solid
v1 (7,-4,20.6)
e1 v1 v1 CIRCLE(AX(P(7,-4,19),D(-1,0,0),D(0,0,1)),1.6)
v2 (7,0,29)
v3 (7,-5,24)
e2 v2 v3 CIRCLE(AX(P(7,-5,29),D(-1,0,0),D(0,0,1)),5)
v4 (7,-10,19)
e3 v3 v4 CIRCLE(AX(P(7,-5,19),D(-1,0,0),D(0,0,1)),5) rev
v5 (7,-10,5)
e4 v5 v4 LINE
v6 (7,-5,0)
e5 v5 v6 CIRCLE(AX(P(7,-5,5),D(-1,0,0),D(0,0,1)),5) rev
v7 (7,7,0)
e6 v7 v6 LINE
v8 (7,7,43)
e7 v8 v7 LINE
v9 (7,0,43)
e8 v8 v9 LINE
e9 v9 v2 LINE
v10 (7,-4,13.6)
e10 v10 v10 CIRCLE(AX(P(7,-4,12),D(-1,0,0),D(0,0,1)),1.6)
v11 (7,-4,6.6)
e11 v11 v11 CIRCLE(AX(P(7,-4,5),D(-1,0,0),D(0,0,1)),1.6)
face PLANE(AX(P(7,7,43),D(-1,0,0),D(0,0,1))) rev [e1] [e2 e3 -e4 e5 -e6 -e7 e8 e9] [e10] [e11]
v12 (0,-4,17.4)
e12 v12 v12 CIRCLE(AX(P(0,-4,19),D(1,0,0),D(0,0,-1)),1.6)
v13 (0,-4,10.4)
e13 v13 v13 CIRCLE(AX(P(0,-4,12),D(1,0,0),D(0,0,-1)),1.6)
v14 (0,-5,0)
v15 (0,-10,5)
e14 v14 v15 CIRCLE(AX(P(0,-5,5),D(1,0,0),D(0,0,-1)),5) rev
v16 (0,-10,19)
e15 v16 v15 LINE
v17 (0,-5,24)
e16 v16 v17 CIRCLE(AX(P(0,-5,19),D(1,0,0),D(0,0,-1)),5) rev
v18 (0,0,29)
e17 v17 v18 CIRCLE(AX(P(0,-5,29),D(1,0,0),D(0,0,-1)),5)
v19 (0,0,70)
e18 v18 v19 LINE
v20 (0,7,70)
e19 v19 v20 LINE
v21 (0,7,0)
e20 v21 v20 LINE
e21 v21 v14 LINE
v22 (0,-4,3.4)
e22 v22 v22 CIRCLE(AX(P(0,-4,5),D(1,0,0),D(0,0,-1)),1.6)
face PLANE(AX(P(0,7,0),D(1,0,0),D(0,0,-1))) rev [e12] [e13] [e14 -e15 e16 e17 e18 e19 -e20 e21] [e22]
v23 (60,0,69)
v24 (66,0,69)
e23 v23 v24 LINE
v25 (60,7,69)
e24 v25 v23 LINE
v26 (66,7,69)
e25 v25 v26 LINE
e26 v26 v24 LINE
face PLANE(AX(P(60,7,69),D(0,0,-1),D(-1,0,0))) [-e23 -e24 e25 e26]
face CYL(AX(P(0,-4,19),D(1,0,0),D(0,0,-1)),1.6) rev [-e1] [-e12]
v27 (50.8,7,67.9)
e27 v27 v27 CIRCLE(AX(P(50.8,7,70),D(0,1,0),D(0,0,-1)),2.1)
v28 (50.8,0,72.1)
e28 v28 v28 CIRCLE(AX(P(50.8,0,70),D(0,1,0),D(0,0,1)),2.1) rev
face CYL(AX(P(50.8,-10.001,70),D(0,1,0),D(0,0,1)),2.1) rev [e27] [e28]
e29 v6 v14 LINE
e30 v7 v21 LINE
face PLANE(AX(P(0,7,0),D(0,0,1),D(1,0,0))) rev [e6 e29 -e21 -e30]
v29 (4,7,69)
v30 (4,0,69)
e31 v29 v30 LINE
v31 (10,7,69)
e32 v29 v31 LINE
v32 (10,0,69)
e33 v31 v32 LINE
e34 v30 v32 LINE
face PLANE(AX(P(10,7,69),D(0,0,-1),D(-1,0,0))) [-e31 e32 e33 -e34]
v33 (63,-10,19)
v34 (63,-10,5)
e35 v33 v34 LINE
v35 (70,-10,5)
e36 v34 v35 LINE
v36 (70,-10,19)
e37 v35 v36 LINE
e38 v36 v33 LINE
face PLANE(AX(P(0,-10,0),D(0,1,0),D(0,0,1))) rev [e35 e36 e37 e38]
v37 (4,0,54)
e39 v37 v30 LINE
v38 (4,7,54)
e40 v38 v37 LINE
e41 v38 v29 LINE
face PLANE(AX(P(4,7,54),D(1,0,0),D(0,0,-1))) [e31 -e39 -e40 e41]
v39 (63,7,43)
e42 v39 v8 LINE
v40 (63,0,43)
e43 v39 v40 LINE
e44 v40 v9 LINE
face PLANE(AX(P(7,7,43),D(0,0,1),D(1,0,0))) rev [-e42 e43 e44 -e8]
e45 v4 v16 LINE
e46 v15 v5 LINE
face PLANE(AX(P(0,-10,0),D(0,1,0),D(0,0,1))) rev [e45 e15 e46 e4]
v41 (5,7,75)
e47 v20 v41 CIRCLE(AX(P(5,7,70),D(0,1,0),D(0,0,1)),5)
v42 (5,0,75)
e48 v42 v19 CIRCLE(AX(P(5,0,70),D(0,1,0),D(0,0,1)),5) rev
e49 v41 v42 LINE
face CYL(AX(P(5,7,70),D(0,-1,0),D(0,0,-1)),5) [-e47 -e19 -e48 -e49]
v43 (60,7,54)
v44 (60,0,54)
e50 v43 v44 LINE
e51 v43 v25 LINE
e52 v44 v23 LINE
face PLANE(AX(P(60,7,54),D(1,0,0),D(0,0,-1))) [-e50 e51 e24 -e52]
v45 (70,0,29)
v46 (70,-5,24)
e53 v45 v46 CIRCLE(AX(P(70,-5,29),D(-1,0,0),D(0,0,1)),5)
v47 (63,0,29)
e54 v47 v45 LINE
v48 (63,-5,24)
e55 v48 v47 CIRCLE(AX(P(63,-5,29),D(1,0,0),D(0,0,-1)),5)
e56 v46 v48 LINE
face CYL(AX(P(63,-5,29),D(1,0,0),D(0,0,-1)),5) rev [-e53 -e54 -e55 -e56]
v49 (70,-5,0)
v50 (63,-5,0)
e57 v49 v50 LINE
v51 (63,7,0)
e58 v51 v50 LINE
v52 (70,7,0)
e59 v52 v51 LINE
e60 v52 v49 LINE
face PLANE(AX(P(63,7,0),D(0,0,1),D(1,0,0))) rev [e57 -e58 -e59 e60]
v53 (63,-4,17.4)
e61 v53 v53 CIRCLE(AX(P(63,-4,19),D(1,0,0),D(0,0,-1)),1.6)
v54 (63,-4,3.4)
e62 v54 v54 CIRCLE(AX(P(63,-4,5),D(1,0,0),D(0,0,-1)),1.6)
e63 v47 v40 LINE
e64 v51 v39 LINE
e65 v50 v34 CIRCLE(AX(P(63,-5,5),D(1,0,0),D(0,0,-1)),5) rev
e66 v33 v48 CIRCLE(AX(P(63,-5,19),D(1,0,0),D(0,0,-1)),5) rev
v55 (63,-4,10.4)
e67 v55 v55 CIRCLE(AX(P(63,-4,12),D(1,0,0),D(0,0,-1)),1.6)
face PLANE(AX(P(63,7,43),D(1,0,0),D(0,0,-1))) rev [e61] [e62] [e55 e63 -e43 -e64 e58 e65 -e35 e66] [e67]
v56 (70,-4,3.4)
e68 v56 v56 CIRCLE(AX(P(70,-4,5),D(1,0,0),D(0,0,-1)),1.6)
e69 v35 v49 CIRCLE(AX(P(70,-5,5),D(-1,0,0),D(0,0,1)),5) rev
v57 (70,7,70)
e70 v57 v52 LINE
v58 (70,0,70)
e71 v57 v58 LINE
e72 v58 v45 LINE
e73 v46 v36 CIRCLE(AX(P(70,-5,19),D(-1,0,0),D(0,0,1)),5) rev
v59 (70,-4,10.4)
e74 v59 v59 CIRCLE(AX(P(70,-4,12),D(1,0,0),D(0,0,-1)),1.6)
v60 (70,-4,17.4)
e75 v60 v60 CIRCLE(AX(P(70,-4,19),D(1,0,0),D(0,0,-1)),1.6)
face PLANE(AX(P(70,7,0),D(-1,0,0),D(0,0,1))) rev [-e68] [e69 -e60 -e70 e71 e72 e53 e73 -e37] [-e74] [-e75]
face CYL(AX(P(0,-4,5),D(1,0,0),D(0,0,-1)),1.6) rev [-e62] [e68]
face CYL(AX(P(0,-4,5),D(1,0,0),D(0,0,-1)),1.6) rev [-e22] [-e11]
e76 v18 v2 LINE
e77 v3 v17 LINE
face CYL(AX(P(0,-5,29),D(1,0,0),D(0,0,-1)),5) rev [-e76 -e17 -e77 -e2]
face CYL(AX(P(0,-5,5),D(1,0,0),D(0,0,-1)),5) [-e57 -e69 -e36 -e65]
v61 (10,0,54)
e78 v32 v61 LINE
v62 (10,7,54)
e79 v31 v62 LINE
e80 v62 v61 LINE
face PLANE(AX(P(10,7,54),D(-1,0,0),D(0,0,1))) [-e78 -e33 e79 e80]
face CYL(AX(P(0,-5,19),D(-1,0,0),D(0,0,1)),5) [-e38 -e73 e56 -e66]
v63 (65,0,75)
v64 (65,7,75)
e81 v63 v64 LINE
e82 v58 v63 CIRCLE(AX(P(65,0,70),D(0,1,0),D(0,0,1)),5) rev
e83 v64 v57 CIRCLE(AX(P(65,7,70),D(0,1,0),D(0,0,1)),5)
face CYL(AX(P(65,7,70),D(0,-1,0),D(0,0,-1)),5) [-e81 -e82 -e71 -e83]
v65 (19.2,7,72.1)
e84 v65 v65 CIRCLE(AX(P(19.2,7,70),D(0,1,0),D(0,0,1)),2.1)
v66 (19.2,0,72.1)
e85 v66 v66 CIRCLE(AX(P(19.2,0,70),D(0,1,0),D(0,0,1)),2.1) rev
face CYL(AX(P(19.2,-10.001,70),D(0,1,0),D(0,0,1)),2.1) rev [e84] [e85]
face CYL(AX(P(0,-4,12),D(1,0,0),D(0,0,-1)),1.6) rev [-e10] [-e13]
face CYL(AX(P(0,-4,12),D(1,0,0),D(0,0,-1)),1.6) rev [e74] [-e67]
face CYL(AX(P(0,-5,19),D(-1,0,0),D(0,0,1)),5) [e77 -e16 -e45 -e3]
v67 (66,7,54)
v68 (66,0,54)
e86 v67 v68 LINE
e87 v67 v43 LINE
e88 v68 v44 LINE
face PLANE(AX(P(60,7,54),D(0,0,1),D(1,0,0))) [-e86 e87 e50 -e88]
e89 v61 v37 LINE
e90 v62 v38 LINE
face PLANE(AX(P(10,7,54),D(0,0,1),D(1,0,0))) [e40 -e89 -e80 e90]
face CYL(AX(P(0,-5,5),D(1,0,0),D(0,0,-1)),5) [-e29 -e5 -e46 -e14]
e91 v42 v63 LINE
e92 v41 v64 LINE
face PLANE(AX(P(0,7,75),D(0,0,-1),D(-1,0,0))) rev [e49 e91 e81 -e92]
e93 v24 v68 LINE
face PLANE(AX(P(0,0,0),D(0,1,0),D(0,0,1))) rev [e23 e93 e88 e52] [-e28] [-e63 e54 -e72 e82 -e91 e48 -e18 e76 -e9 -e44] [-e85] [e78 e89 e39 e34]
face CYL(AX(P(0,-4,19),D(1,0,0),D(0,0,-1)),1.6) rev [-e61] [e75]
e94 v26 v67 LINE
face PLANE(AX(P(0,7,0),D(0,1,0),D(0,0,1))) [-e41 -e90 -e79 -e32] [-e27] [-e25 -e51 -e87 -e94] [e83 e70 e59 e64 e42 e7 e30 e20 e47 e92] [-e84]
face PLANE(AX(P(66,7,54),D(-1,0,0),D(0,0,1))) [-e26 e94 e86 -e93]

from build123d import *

# Parameters (mm, degrees)
SKETCH_1_W          = 6
SKETCH_1_H          = 15
EXTRUDE_1_DEPTH     = 7
SKETCH_2_W          = 7
SKETCH_2_H          = 24
EXTRUDE_2_DEPTH     = 10
SKETCH_3_R          = 1.6
CUT_EXTRUDE_1_DEPTH = 104.07764064
CUT_EXTRUDE_2_REACH = 105.99
SKETCH_7_R          = 2.1
FILLET_1_R          = 5


with BuildPart() as part:
    # 草图1 → 凸台-拉伸1 (new body)
    with BuildSketch(Plane(origin=(0, 0, 0), x_dir=(1, 0, 0), z_dir=(0, 1, 0))):
        Polygon((7, -43), (63, -43), (63, 0), (70, 0), (70, -75), (0, -75), (0, 0), (7, 0), align=None)
        with Locations((63, -61.5)):
            Rectangle(SKETCH_1_W, SKETCH_1_H, mode=Mode.SUBTRACT)
        with Locations((7, -61.5)):
            Rectangle(SKETCH_1_W, SKETCH_1_H, mode=Mode.SUBTRACT)
    extrude(amount=EXTRUDE_1_DEPTH)

    # 草图2 → 凸台-拉伸2 (add)
    with BuildSketch(Plane.XZ):
        with Locations((3.5, 12)):
            Rectangle(SKETCH_2_W, SKETCH_2_H)
        with Locations((66.5, 12)):
            Rectangle(SKETCH_2_W, SKETCH_2_H)
    extrude(amount=EXTRUDE_2_DEPTH)

    # 草图3 → 切除-拉伸1 (cut, through all)
    with BuildSketch(Plane(origin=(70, 0, 0), x_dir=(0, 0, -1), z_dir=(1, 0, 0))):
        with Locations((-12, -4)):
            Circle(SKETCH_3_R)
        with Locations((-19, -4)):
            Circle(SKETCH_3_R)
        with Locations((-5, -4)):
            Circle(SKETCH_3_R)
    extrude(amount=-CUT_EXTRUDE_1_DEPTH, mode=Mode.SUBTRACT)

    # 草图7 → 切除-拉伸2 (cut, up to next)
    with BuildSketch(Plane(origin=(0, 7, 0), x_dir=(1, 0, 0), z_dir=(0, 1, 0)), mode=Mode.PRIVATE) as cut_extrude_2_sk1:
        with Locations(Location((19.2, -70, 0), (0, 0, 270))):
            Circle(SKETCH_7_R)
    cut_extrude_2_tool1 = extrude(cut_extrude_2_sk1.sketch, amount=-CUT_EXTRUDE_2_REACH, mode=Mode.PRIVATE) & part.part
    # 草图7 → 切除-拉伸2 (cut, up to next)
    with BuildSketch(Plane(origin=(0, 7, 0), x_dir=(1, 0, 0), z_dir=(0, 1, 0)), mode=Mode.PRIVATE) as cut_extrude_2_sk2:
        with Locations(Location((50.8, -70, 0), (0, 0, 270))):
            Circle(SKETCH_7_R)
    cut_extrude_2_tool2 = extrude(cut_extrude_2_sk2.sketch, amount=-CUT_EXTRUDE_2_REACH, mode=Mode.PRIVATE) & part.part
    add(cut_extrude_2_tool1.solids().sort_by_distance((19.2, 7, 70))[0], mode=Mode.SUBTRACT)
    add(cut_extrude_2_tool2.solids().sort_by_distance((50.8, 7, 70))[0], mode=Mode.SUBTRACT)

    # 圆角1
    fillet_1_edges = [part.edges().sort_by_distance(p)[0] for p in [
        (70, 3.5, 75),
        (0, 3.5, 75),
        (66.5, -10, 24),
        (66.5, 0, 24),
        (66.5, -10, 0),
        (3.5, -10, 0),
        (3.5, -10, 24),
        (3.5, 0, 24),
    ]]
    fillet(fillet_1_edges, radius=FILLET_1_R - 0.0001)  # a hair under: the kernel refuses the full size


solid = part.part
